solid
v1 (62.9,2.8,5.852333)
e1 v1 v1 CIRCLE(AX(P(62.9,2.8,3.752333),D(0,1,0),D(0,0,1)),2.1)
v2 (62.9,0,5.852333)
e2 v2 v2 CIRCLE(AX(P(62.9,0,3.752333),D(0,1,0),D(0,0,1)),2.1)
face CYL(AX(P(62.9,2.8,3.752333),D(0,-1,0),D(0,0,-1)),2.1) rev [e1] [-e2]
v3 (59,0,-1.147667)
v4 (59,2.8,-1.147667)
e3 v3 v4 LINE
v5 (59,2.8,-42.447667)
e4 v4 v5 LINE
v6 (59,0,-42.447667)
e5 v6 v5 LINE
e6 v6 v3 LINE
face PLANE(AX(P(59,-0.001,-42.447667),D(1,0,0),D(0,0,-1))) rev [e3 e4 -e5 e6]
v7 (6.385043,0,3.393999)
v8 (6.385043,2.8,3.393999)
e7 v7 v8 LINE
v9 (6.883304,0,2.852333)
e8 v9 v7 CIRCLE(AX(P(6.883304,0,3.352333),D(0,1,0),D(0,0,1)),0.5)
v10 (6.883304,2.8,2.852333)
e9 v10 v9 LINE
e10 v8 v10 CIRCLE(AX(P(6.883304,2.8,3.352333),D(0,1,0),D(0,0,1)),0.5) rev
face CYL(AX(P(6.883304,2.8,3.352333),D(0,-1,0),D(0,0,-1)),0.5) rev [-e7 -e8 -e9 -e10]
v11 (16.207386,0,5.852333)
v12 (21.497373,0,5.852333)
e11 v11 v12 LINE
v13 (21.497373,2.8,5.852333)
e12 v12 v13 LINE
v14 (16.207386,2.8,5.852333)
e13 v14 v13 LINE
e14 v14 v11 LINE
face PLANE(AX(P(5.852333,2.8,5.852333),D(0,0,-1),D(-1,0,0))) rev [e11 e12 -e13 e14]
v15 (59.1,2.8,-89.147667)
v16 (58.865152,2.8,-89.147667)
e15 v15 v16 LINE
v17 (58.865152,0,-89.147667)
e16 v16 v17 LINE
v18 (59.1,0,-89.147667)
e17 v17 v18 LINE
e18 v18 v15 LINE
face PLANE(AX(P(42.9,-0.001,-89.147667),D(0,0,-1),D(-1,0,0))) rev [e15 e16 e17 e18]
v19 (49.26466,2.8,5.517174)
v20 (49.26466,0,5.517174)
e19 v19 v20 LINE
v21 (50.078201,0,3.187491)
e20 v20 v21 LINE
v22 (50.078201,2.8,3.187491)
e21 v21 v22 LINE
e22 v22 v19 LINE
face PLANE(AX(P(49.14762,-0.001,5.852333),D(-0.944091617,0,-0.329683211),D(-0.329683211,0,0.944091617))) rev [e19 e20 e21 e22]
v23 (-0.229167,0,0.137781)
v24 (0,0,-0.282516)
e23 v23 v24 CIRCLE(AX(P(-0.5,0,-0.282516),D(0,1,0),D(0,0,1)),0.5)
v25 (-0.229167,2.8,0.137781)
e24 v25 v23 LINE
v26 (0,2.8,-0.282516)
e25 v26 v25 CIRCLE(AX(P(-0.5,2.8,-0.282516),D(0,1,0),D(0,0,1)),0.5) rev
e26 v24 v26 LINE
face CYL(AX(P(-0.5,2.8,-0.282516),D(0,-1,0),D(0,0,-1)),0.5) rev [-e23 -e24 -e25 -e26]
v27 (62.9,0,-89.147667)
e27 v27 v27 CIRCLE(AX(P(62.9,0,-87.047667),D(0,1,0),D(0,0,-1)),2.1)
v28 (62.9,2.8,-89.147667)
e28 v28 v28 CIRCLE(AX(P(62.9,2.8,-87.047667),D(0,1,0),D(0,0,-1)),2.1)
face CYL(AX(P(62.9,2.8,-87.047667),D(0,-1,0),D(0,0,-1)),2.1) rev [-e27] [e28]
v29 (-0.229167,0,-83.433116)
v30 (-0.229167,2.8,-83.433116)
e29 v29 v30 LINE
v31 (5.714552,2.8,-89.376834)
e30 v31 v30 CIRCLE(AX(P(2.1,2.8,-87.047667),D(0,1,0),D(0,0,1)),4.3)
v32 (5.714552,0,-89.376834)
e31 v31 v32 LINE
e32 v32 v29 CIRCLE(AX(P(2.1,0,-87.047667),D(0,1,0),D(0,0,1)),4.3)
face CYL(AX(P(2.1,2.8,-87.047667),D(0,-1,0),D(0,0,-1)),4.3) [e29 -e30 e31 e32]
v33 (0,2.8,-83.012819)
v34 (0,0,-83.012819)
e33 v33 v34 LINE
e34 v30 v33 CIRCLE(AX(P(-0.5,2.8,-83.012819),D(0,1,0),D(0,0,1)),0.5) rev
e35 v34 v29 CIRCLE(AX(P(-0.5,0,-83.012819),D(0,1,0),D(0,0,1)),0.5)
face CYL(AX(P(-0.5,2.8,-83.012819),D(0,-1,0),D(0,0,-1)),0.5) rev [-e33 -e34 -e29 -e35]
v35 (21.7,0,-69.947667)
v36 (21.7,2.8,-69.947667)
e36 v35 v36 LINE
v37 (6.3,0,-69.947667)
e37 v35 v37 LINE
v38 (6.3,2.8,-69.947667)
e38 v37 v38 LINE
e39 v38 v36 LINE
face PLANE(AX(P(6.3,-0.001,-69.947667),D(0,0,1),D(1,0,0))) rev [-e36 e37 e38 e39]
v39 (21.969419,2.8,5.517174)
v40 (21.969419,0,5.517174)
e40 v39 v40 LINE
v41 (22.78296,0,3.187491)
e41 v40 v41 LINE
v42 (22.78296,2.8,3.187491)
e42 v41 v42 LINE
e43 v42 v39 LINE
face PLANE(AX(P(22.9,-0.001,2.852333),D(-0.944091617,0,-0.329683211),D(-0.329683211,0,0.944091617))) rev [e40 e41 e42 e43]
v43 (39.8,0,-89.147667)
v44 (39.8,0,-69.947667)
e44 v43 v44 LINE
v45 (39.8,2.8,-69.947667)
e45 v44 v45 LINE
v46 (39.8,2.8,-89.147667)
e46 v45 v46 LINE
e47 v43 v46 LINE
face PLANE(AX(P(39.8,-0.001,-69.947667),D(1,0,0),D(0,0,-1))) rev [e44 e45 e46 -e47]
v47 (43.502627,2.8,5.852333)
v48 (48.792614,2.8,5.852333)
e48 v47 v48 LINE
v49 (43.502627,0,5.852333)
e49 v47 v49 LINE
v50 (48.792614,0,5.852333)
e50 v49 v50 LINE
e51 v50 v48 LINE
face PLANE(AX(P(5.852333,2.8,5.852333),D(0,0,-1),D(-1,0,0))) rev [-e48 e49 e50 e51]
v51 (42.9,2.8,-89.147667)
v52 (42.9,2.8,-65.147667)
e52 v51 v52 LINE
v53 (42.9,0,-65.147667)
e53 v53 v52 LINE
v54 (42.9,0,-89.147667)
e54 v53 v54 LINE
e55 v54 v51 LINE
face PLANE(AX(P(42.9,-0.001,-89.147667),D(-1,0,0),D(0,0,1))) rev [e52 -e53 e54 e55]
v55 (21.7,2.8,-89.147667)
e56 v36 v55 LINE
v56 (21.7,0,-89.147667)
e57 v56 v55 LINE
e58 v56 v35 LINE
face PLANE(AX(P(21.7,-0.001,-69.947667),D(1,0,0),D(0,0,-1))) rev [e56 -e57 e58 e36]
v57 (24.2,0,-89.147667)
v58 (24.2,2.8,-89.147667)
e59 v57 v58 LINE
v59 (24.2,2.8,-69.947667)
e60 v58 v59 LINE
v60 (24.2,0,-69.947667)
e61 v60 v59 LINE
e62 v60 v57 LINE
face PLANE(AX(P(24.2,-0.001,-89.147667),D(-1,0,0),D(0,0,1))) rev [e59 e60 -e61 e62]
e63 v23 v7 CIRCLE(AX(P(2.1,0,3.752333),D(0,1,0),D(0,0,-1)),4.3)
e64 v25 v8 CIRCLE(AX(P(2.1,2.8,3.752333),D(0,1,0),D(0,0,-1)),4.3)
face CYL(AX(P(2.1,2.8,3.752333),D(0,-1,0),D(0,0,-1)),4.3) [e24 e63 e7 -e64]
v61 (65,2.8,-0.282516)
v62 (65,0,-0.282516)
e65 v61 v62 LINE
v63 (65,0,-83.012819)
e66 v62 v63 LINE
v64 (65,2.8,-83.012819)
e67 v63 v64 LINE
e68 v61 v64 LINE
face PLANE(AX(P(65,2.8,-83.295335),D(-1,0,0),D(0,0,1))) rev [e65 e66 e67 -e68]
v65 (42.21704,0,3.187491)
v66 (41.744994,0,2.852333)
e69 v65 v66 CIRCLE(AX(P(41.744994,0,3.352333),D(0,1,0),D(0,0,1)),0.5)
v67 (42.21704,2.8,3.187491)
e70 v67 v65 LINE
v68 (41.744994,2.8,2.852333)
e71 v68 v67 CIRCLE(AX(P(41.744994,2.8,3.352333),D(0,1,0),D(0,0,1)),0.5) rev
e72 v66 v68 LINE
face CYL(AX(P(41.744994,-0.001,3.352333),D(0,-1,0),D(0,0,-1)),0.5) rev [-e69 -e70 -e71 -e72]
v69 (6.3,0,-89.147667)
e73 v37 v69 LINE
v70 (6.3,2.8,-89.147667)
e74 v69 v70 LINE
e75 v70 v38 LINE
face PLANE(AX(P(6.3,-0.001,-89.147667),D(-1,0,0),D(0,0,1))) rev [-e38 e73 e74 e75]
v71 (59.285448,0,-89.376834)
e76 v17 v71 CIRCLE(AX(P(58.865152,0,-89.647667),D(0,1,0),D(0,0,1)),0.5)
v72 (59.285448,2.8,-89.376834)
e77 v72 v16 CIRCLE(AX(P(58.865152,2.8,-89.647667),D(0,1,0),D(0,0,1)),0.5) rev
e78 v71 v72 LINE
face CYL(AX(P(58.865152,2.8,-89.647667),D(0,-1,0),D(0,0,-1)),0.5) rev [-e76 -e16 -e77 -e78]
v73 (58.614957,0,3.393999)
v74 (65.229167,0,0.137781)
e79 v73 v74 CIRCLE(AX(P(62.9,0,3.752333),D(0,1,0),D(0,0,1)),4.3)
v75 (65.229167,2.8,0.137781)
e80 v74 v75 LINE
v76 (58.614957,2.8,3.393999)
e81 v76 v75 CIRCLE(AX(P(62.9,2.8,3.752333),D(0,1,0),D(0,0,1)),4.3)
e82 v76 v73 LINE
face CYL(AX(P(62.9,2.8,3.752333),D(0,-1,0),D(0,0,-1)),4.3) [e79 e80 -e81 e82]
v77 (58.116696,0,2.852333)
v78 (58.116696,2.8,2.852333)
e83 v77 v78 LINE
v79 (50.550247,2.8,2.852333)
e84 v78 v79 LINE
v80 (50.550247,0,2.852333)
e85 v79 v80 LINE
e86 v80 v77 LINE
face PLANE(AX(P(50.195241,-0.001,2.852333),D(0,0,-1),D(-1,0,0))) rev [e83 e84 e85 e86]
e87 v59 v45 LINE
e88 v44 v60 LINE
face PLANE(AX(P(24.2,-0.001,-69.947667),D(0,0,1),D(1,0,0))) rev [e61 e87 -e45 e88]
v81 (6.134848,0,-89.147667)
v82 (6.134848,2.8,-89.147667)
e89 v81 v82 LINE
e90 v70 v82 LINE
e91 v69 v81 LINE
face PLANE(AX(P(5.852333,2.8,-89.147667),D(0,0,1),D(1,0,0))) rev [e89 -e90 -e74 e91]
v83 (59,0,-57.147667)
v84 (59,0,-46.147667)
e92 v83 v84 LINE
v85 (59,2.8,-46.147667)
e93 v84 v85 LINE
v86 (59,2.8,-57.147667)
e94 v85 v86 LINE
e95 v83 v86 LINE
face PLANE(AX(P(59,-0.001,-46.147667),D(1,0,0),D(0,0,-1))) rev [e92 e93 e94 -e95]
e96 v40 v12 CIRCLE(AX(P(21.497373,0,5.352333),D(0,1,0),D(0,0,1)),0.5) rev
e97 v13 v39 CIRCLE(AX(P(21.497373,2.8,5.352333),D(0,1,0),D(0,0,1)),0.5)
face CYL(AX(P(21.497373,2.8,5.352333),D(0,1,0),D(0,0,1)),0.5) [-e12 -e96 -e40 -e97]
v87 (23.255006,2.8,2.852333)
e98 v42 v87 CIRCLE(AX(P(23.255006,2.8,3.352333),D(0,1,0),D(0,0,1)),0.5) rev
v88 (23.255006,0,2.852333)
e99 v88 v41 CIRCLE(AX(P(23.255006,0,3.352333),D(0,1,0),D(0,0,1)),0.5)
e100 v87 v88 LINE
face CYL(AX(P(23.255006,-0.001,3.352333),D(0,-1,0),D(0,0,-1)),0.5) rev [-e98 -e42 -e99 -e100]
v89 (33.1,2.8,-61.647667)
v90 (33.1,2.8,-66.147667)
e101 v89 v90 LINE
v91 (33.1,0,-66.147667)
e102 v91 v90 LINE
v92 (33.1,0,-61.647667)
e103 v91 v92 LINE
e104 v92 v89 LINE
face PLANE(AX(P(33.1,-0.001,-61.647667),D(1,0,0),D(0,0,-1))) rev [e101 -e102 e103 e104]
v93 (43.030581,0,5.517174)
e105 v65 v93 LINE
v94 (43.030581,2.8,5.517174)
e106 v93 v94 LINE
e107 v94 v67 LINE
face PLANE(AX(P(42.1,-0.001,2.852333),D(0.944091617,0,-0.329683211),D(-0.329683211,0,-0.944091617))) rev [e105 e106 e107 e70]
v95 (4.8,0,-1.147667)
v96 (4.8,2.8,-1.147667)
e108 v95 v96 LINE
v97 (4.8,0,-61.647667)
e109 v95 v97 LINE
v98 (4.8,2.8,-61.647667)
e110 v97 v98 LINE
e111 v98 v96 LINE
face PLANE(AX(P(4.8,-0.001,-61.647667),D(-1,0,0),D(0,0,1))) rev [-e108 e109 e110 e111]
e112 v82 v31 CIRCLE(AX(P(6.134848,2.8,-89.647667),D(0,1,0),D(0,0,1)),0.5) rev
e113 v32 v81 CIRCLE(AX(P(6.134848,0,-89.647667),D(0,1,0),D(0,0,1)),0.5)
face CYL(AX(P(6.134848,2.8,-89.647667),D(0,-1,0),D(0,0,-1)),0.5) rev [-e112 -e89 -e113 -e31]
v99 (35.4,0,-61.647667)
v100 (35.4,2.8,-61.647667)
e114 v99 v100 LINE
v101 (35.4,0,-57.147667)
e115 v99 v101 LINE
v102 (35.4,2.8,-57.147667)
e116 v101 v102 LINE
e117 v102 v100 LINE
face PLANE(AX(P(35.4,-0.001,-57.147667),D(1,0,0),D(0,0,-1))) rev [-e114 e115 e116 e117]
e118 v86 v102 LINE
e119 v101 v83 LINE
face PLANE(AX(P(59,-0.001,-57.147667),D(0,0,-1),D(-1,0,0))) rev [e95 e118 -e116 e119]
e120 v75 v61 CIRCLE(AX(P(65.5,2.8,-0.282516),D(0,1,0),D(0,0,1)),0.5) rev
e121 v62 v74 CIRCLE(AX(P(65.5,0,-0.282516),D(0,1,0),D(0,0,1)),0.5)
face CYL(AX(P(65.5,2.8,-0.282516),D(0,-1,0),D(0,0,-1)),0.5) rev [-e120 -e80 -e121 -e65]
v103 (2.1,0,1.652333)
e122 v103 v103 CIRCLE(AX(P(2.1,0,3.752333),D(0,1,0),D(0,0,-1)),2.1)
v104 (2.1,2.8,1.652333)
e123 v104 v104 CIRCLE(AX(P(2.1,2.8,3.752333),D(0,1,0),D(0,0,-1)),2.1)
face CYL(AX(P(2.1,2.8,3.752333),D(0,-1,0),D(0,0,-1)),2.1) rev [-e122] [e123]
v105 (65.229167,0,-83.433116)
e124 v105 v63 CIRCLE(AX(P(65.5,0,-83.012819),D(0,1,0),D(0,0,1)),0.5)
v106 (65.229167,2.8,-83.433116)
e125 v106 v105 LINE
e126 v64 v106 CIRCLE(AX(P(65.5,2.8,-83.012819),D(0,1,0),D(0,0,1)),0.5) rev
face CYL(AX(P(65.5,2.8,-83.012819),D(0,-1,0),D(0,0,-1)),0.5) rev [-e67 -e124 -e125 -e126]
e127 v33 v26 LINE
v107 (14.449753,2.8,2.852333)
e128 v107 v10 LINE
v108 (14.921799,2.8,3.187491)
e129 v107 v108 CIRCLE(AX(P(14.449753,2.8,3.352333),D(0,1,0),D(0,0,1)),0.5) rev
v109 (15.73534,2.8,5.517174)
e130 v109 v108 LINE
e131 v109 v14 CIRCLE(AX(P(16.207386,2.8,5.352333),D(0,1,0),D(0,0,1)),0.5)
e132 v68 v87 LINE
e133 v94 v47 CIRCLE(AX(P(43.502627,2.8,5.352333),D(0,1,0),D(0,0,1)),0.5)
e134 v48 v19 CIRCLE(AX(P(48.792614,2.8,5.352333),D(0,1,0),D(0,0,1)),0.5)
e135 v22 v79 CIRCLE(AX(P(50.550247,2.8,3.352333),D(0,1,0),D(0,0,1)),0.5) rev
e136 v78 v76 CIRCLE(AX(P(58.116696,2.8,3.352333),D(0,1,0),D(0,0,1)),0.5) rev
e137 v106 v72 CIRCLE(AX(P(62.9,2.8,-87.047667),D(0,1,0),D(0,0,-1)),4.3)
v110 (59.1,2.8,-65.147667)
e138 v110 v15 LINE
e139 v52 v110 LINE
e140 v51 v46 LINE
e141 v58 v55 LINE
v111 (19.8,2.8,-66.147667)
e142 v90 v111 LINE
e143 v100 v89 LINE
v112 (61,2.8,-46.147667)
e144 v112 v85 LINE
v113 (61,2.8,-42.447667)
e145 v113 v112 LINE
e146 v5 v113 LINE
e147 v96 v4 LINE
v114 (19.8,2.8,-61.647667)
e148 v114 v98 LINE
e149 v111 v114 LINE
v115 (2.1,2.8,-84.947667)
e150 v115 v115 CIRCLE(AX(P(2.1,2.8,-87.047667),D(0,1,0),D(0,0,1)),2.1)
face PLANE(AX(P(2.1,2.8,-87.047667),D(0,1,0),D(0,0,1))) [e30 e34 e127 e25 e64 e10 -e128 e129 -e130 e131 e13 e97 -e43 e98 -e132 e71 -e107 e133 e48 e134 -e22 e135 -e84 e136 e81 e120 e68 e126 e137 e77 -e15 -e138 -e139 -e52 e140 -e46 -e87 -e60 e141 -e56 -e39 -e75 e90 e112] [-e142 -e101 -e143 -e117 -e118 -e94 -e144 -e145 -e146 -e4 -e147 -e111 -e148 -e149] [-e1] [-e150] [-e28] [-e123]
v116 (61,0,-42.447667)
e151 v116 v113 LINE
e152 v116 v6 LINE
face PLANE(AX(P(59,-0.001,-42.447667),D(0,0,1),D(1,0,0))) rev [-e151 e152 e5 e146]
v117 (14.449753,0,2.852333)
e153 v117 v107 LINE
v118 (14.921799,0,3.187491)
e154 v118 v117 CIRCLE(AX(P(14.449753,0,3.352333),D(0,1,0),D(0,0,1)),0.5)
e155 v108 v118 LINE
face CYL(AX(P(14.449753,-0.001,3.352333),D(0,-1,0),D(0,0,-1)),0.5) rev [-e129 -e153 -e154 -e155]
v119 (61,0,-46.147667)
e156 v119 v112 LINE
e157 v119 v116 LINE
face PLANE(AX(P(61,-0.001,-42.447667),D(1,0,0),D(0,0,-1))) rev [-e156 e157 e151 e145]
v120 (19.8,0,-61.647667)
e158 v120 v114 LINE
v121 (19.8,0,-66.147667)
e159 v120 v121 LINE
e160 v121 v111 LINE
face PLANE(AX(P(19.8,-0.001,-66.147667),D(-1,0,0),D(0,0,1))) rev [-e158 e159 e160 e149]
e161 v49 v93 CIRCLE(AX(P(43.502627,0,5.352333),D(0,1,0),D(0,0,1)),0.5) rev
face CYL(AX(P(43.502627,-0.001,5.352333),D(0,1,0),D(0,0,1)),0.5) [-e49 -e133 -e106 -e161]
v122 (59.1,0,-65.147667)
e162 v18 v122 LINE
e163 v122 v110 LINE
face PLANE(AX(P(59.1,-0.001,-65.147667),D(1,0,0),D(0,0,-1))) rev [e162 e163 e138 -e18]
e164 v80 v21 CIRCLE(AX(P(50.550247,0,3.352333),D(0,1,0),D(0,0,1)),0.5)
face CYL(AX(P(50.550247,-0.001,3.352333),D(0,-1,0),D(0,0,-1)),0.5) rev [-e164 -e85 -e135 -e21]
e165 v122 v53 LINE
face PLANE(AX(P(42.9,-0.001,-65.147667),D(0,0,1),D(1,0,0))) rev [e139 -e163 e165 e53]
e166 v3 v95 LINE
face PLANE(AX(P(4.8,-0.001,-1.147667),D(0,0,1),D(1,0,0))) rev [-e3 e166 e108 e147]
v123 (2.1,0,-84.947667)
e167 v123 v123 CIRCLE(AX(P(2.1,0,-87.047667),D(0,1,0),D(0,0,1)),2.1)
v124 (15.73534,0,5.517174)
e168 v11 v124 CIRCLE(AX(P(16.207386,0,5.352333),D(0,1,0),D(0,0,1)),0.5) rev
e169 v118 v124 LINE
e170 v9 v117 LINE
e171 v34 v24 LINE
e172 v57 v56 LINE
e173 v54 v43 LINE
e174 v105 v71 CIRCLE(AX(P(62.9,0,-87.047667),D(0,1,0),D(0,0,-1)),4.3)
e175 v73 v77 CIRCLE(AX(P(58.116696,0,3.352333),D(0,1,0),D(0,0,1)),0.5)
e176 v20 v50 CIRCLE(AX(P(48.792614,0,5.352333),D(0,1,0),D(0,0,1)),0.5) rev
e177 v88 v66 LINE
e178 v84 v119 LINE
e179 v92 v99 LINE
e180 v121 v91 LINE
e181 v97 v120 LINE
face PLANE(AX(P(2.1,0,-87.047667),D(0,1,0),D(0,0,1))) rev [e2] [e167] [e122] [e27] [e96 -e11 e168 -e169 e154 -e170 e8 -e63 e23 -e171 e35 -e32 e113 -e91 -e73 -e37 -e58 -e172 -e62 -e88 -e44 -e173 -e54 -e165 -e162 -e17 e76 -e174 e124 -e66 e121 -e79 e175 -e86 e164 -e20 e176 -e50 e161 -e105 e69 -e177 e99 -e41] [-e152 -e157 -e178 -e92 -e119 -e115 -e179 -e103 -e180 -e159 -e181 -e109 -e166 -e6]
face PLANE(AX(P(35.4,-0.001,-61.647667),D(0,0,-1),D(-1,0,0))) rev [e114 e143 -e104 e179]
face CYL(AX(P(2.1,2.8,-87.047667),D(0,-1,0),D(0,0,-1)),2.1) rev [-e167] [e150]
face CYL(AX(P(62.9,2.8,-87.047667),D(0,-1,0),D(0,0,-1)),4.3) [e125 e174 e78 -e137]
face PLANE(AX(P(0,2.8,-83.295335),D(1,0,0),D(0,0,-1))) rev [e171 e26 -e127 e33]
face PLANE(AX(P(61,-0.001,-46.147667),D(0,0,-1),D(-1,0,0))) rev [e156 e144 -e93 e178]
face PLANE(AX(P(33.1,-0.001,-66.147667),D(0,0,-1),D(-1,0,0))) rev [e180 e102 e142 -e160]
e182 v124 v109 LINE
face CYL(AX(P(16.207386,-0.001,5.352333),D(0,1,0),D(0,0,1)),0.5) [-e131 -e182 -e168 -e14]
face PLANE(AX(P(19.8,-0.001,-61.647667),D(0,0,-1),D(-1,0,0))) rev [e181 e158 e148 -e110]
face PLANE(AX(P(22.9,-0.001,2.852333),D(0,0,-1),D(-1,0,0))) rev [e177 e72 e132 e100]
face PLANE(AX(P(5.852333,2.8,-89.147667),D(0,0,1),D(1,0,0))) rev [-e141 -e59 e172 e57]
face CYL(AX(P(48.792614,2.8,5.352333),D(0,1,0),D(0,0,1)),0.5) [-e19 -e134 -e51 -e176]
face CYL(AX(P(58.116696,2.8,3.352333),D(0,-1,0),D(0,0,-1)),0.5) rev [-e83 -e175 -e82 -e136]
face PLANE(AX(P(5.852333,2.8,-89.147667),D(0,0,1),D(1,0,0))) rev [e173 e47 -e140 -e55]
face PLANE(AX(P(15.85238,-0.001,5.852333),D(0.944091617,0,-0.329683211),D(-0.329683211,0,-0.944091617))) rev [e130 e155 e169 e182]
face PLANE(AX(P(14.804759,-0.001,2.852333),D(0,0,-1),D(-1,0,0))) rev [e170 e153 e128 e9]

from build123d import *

# Parameters (mm, degrees)
BASEPLATE_OUTLINE_R = 2.1
BASEPLATE_DEPTH     = 2.8
CUT_EXTRUDE1_REACH  = 115.438
SKETCH3_W           = 15.4
SKETCH3_H           = 19.2
SKETCH3_W_2         = 15.6
SKETCH3_W_3         = 16.2
SKETCH3_H_2         = 24


# Read off the part's stored shape, not the designer's step: BasePlate
with BuildPart() as part:
    # BasePlate outline → BasePlate (new body)
    with BuildSketch(Plane(origin=(0, 0, 0), x_dir=(1, 0, 0), z_dir=(0, 1, 0))):
        with BuildLine():
            Line((43.502626614, -5.852332608), (48.792614178, -5.852332608))
            ThreePointArc((48.792614178, -5.852332608), (49.082078508, -5.760021707), (49.264659986, -5.517174213))
            Line((49.264659986, -5.517174213), (50.078201202, -3.187491002))
            ThreePointArc((50.078201202, -3.187491002), (50.26078268, -2.944643509), (50.55024701, -2.852332608))
            Line((50.55024701, -2.852332608), (58.116695703, -2.852332608))
            ThreePointArc((58.116695703, -2.852332608), (58.484685739, -3.013831008), (58.614956567, -3.393999275))
            ThreePointArc((58.614956567, -3.393999275), (64.799237397, -7.61016844), (65.229166667, -0.137781095))
            ThreePointArc((65.229166667, -0.137781095), (65.061014427, 0.043158816), (65, 0.282515593))
            Line((65, 0.282515593), (65, 83.012819192))
            ThreePointArc((65, 83.012819192), (65.061014427, 83.252175969), (65.229166667, 83.433115879))
            ThreePointArc((65.229166667, 83.433115879), (65.940559159, 90.088226551), (59.285448487, 89.376834059))
            ThreePointArc((59.285448487, 89.376834059), (59.104508577, 89.208681819), (58.8651518, 89.147667392))
            Line((58.8651518, 89.147667392), (6.1348482, 89.147667392))
            ThreePointArc((6.1348482, 89.147667392), (5.895491423, 89.208681819), (5.714551513, 89.376834059))
            ThreePointArc((5.714551513, 89.376834059), (-0.940559159, 90.088226551), (-0.229166667, 83.433115879))
            ThreePointArc((-0.229166667, 83.433115879), (-0.061014427, 83.252175969), (0, 83.012819192))
            Line((0, 83.012819192), (0, 0.282515593))
            ThreePointArc((0, 0.282515593), (-0.061014427, 0.043158816), (-0.229166667, -0.137781095))
            ThreePointArc((-0.229166667, -0.137781095), (0.200762603, -7.61016844), (6.385043433, -3.393999275))
            ThreePointArc((6.385043433, -3.393999275), (6.515314261, -3.013831008), (6.883304297, -2.852332608))
            Line((6.883304297, -2.852332608), (14.44975299, -2.852332608))
            ThreePointArc((14.44975299, -2.852332608), (14.73921732, -2.944643509), (14.921798798, -3.187491002))
            Line((14.921798798, -3.187491002), (15.735340014, -5.517174213))
            ThreePointArc((15.735340014, -5.517174213), (15.917921492, -5.760021707), (16.207385822, -5.852332608))
            Line((16.207385822, -5.852332608), (21.497373386, -5.852332608))
            ThreePointArc((21.497373386, -5.852332608), (21.786837716, -5.760021707), (21.969419194, -5.517174213))
            Line((21.969419194, -5.517174213), (22.78296041, -3.187491002))
            ThreePointArc((22.78296041, -3.187491002), (22.965541888, -2.944643509), (23.255006218, -2.852332608))
            Line((23.255006218, -2.852332608), (41.744993782, -2.852332608))
            ThreePointArc((41.744993782, -2.852332608), (42.034458112, -2.944643509), (42.21703959, -3.187491002))
            Line((42.21703959, -3.187491002), (43.030580806, -5.517174213))
            ThreePointArc((43.030580806, -5.517174213), (43.213162284, -5.760021707), (43.502626614, -5.852332608))
        make_face()
        with Locations((2.1, -3.752332608)):
            Circle(BASEPLATE_OUTLINE_R, mode=Mode.SUBTRACT)
        with Locations((62.9, -3.752332608)):
            Circle(BASEPLATE_OUTLINE_R, mode=Mode.SUBTRACT)
        with Locations((2.1, 87.047667392)):
            Circle(BASEPLATE_OUTLINE_R, mode=Mode.SUBTRACT)
        with Locations((62.9, 87.047667392)):
            Circle(BASEPLATE_OUTLINE_R, mode=Mode.SUBTRACT)
    extrude(amount=BASEPLATE_DEPTH)

    # Sketch3 → Cut-Extrude1 (cut, up to next)
    with BuildSketch(Plane(origin=(0, 2.8, 0), x_dir=(1, 0, 0), z_dir=(0, 1, 0)), mode=Mode.PRIVATE) as cut_extrude1_sk1:
        Polygon((4.8, 1.147667392), (59, 1.147667392), (59, 42.447667392), (61, 42.447667392), (61, 46.147667392), (59, 46.147667392), (59, 57.147667392), (35.4, 57.147667392), (35.4, 61.647667392), (33.1, 61.647667392), (33.1, 66.147667392), (19.8, 66.147667392), (19.8, 61.647667392), (4.8, 61.647667392), align=None)
    cut_extrude1_tool1 = extrude(cut_extrude1_sk1.sketch, amount=-CUT_EXTRUDE1_REACH, mode=Mode.PRIVATE) & part.part
    # Sketch3 → Cut-Extrude1 (cut, up to next)
    with BuildSketch(Plane(origin=(0, 2.8, 0), x_dir=(1, 0, 0), z_dir=(0, 1, 0)), mode=Mode.PRIVATE) as cut_extrude1_sk2:
        with Locations((14, 79.547667392)):
            Rectangle(SKETCH3_W, SKETCH3_H)
    cut_extrude1_tool2 = extrude(cut_extrude1_sk2.sketch, amount=-CUT_EXTRUDE1_REACH, mode=Mode.PRIVATE) & part.part
    # Sketch3 → Cut-Extrude1 (cut, up to next)
    with BuildSketch(Plane(origin=(0, 2.8, 0), x_dir=(1, 0, 0), z_dir=(0, 1, 0)), mode=Mode.PRIVATE) as cut_extrude1_sk3:
        with Locations((32, 79.547667392)):
            Rectangle(SKETCH3_W_2, SKETCH3_H)
    cut_extrude1_tool3 = extrude(cut_extrude1_sk3.sketch, amount=-CUT_EXTRUDE1_REACH, mode=Mode.PRIVATE) & part.part
    # Sketch3 → Cut-Extrude1 (cut, up to next)
    with BuildSketch(Plane(origin=(0, 2.8, 0), x_dir=(1, 0, 0), z_dir=(0, 1, 0)), mode=Mode.PRIVATE) as cut_extrude1_sk4:
        with Locations((51, 77.147667392)):
            Rectangle(SKETCH3_W_3, SKETCH3_H_2)
    cut_extrude1_tool4 = extrude(cut_extrude1_sk4.sketch, amount=-CUT_EXTRUDE1_REACH, mode=Mode.PRIVATE) & part.part
    add(cut_extrude1_tool1.solids().sort_by_distance((31.36203, 2.8, -31.109713))[0], mode=Mode.SUBTRACT)
    add(cut_extrude1_tool2.solids().sort_by_distance((14, 2.8, -79.547667))[0], mode=Mode.SUBTRACT)
    add(cut_extrude1_tool3.solids().sort_by_distance((32, 2.8, -79.547667))[0], mode=Mode.SUBTRACT)
    add(cut_extrude1_tool4.solids().sort_by_distance((51, 2.8, -77.147667))[0], mode=Mode.SUBTRACT)


solid = part.part
